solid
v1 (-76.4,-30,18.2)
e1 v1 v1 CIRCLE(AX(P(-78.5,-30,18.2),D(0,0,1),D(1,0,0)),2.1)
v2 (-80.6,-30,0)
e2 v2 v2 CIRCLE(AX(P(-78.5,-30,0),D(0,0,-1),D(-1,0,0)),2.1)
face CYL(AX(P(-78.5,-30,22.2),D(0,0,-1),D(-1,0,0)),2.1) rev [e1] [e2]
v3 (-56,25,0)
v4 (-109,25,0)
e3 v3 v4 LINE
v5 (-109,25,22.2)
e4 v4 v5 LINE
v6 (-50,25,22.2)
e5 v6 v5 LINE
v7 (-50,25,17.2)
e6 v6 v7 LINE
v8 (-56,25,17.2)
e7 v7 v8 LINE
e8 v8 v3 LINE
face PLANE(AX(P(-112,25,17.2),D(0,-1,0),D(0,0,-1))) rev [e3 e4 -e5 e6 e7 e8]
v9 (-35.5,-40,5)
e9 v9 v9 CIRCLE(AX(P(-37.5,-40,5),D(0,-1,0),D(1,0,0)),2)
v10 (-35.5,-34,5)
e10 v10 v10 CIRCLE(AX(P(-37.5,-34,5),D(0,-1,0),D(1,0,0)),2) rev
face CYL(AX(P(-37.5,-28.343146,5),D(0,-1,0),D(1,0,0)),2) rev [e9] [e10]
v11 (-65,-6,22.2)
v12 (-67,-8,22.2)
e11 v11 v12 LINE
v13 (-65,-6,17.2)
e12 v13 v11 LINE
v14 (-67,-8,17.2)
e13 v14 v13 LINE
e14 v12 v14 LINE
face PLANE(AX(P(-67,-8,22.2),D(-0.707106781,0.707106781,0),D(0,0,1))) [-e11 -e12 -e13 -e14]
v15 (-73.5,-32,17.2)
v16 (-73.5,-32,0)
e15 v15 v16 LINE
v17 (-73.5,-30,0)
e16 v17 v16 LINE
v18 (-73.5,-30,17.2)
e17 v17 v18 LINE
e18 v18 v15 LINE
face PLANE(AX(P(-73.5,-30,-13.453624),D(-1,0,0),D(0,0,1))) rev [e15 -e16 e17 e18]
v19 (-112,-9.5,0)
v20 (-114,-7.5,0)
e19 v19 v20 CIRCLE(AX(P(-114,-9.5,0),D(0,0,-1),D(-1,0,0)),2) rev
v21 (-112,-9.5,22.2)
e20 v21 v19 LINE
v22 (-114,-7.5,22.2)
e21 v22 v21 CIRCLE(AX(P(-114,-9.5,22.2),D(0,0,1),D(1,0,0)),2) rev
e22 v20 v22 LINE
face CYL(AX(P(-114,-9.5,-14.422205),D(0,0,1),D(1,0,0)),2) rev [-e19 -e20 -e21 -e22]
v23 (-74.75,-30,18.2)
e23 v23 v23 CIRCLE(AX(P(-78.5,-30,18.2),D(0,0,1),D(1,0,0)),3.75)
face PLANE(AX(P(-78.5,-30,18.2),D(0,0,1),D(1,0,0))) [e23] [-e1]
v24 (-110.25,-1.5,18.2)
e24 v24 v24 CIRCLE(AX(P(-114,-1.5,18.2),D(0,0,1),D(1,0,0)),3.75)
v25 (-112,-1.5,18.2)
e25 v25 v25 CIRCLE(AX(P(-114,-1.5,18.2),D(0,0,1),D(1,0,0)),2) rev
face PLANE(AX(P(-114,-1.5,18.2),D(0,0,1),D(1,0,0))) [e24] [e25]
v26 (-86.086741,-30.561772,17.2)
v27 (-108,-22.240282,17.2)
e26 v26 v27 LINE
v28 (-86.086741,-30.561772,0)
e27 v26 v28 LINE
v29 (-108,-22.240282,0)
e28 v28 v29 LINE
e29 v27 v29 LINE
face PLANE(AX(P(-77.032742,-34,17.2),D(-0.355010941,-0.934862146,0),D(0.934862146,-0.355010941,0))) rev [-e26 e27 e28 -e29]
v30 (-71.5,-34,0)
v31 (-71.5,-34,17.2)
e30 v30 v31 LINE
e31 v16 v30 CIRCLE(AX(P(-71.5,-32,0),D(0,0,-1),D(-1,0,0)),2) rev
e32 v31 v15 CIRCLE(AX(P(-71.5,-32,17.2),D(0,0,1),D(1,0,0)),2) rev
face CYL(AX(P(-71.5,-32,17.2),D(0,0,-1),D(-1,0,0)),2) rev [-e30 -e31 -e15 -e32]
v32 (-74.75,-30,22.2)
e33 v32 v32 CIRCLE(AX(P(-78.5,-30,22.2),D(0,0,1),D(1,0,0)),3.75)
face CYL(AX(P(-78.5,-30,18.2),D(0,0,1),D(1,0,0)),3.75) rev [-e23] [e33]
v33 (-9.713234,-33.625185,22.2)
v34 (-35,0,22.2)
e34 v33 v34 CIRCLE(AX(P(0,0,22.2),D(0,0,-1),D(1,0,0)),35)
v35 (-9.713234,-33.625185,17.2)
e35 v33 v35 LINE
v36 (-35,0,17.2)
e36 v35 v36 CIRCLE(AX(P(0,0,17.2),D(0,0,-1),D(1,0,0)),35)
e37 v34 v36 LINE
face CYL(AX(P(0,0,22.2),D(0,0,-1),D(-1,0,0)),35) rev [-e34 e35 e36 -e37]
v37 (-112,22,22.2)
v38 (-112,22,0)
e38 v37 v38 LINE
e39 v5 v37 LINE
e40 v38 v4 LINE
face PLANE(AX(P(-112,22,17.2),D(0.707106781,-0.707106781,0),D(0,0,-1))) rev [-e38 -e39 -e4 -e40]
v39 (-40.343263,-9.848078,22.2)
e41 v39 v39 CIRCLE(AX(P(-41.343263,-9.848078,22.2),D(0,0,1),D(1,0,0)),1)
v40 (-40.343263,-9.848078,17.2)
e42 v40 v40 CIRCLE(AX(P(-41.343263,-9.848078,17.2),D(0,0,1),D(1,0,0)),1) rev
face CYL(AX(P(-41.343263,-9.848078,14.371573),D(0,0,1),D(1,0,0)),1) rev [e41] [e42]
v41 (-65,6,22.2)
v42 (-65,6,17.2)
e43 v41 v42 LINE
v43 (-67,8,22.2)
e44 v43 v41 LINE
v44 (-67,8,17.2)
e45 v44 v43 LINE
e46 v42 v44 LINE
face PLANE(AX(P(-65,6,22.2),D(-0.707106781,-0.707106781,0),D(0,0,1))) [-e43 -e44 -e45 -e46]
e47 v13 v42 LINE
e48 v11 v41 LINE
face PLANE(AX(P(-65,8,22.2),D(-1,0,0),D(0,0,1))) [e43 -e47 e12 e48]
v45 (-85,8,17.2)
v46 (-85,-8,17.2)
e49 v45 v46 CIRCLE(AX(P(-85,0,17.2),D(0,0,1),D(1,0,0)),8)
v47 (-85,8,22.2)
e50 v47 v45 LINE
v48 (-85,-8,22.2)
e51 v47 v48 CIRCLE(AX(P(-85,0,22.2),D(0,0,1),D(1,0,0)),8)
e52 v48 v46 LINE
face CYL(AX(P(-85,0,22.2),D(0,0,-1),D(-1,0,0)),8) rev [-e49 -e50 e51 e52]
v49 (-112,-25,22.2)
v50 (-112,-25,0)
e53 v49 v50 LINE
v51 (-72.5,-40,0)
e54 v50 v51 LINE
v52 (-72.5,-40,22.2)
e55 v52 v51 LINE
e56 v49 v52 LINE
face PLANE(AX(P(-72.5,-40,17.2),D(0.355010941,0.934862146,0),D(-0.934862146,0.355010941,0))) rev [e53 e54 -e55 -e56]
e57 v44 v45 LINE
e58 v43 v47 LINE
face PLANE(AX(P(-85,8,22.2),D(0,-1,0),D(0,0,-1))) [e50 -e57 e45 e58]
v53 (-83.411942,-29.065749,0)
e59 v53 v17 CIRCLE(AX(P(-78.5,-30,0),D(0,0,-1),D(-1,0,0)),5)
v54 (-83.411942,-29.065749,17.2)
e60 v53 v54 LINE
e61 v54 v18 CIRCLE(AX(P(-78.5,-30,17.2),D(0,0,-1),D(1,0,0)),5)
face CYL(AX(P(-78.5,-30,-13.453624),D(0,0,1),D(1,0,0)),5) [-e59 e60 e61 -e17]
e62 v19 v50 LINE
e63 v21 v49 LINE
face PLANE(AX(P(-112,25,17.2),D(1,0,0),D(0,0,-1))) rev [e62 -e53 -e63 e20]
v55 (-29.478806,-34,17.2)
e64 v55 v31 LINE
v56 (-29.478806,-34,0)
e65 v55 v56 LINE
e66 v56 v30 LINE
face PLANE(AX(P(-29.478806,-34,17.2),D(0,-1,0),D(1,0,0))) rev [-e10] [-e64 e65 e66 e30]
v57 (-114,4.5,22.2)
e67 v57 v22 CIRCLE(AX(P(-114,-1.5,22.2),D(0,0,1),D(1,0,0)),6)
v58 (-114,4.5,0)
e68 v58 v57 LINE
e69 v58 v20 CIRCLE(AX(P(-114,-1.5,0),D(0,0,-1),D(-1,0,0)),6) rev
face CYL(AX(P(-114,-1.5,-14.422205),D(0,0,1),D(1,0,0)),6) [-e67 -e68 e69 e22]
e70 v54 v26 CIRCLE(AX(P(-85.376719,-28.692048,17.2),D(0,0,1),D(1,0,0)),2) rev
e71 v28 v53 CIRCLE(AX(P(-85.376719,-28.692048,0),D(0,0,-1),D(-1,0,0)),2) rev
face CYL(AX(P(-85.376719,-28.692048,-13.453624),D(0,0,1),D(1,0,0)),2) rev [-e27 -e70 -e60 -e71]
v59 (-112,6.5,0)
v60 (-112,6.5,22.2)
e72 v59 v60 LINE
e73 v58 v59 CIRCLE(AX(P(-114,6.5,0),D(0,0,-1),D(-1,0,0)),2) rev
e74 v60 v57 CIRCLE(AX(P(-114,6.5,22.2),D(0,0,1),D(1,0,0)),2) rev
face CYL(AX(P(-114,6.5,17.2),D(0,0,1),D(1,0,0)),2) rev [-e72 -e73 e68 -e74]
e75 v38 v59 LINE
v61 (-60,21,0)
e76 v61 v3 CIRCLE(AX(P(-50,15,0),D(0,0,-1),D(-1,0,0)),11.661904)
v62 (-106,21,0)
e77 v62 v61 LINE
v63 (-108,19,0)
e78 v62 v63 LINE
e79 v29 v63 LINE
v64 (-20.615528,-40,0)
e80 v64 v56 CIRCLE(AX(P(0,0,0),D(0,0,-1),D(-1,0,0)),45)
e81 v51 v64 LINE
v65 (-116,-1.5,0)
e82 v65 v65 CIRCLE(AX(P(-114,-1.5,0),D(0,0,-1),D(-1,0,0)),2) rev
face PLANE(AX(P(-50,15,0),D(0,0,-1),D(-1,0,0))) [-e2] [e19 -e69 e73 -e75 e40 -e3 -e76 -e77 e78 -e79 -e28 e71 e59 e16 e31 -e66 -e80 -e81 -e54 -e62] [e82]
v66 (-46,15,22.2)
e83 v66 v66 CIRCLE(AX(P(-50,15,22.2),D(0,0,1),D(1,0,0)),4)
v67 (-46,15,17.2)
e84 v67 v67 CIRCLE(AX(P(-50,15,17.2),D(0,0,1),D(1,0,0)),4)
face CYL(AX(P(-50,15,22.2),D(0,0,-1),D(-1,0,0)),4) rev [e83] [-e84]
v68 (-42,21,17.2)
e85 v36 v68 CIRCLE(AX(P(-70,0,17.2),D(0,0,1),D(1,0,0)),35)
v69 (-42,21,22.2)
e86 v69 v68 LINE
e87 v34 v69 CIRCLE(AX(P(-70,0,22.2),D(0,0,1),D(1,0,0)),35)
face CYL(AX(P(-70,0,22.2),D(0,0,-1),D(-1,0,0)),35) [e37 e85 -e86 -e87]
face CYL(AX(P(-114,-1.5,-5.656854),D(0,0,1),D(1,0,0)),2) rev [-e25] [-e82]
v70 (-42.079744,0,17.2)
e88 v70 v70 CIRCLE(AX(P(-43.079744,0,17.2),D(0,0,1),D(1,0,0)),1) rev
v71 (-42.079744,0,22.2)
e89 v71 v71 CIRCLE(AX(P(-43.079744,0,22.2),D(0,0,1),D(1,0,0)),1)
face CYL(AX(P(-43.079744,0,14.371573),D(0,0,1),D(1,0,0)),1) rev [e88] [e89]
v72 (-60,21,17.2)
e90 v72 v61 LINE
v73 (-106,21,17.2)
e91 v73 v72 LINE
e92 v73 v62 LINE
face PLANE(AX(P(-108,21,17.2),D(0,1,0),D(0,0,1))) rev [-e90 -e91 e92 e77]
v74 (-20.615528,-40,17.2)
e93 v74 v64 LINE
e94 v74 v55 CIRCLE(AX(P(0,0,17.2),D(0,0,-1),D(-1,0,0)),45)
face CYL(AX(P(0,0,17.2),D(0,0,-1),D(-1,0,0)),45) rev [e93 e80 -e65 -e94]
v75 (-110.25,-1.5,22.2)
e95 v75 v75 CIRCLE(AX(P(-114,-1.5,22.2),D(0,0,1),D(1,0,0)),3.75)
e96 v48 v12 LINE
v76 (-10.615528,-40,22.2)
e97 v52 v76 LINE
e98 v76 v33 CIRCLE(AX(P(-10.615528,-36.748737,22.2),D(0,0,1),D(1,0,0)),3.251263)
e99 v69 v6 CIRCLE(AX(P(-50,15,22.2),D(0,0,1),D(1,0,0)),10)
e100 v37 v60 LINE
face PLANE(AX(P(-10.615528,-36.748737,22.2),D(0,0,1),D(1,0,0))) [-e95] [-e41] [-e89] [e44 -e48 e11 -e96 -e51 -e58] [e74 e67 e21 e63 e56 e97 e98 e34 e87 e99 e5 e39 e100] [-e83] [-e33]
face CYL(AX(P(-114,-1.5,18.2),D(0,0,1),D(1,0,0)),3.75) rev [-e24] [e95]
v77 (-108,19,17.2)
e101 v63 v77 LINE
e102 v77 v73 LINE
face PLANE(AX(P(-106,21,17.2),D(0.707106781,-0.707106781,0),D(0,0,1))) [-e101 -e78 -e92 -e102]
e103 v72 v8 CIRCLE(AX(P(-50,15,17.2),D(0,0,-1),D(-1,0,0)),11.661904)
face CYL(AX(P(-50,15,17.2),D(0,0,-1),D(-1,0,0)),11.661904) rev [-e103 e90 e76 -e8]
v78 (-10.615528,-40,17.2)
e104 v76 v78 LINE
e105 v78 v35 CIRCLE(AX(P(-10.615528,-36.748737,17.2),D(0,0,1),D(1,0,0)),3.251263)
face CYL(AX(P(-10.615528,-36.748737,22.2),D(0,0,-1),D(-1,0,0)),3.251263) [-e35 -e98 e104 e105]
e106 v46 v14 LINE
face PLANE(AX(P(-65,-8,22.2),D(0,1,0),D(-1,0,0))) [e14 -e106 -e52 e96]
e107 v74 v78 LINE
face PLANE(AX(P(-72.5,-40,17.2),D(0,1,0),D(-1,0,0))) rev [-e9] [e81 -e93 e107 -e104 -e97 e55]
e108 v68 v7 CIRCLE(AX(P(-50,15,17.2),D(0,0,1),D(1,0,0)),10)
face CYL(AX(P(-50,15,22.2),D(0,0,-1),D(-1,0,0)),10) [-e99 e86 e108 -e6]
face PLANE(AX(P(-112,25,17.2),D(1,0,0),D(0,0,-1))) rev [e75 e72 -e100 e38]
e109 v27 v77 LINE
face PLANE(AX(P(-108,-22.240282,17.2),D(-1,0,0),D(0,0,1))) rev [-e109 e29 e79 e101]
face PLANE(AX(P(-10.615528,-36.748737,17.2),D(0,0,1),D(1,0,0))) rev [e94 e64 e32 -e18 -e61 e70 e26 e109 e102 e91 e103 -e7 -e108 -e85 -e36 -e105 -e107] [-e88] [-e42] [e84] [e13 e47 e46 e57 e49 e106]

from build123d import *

# Parameters (mm, degrees)
BOSS_EXTRUDE1_DEPTH = 17.2
CHAMFER3_SIZE       = 3
CHAMFER2_SIZE       = 2
SKETCH2_R           = 4
SKETCH2_R_2         = 2.1
BOSS_EXTRUDE2_DEPTH = 5
SKETCH3_R           = 1
CUT_EXTRUDE1_DEPTH  = 5
BOSS_EXTRUDE8_START = 17.2
SKETCH10_R          = 2.1
BOSS_EXTRUDE8_DEPTH = 17.2
SKETCH11_R          = 3.75
CUT_EXTRUDE2_DEPTH  = 4
BOSS_EXTRUDE9_DEPTH = 22.2
FILLET3_R           = 2
SKETCH13_R          = 2
CUT_EXTRUDE3_DEPTH  = 22.2
SKETCH14_R          = 3.75
CUT_EXTRUDE4_DEPTH  = 4
SKETCH15_R          = 2
CUT_EXTRUDE5_DEPTH  = 6
FILLET4_R           = 2
CHAMFER4_SIZE       = 2


with BuildPart() as part:
    # Sketch1 → Boss-Extrude1 (new body)
    with BuildSketch(Plane.XY):
        with BuildLine():
            Line((-112, 25), (-112, -25))
            Line((-112, -25), (-72.5, -40))
            Line((-72.5, -40), (-20.615528128, -40))
            ThreePointArc((-20.615528128, -40), (-25.226188309, -37.264452544), (-29.478805946, -34))
            Line((-29.478805946, -34), (-77.032741633, -34))
            Line((-77.032741633, -34), (-108, -22.240281633))
            Line((-108, -22.240281633), (-108, 21))
            Line((-108, 21), (-60, 21))
            ThreePointArc((-60, 21), (-58.246211251, 23.246211251), (-56, 25))
            Line((-56, 25), (-112, 25))
        make_face()
    extrude(amount=BOSS_EXTRUDE1_DEPTH)

    # Chamfer3
    chamfer3_edges = [part.edges().sort_by_distance(p)[0] for p in [
        (-112, 25, 8.6),
    ]]
    chamfer(chamfer3_edges, length=CHAMFER3_SIZE)

    # Chamfer2
    chamfer2_edges = [part.edges().sort_by_distance(p)[0] for p in [
        (-108, 21, 8.6),
    ]]
    chamfer(chamfer2_edges, length=CHAMFER2_SIZE)

    # Sketch2 → Boss-Extrude2 (add)
    with BuildSketch(Plane.XY.offset(17.2)):
        with BuildLine():
            Line((-72.5, -40), (-20.615528128, -40))
            Line((-20.615528128, -40), (-10.615528128, -40))
            ThreePointArc((-10.615528128, -40), (-7.396351284, -37.204380582), (-9.713234444, -33.625185154))
            ThreePointArc((-9.713234444, -33.625185154), (-27.972872623, -21.03612125), (-35, 0))
            ThreePointArc((-35, 0), (-36.796084568, 11.067971811), (-42, 21))
            ThreePointArc((-42, 21), (-45.527864045, 23.94427191), (-50, 25))
            Line((-50, 25), (-109, 25))
            Line((-109, 25), (-112, 22))
            Line((-112, 22), (-112, -25))
            Line((-112, -25), (-72.5, -40))
        make_face()
        with Locations((-50, 15)):
            Circle(SKETCH2_R, mode=Mode.SUBTRACT)
        with Locations((-78.5, -30)):
            Circle(SKETCH2_R_2, mode=Mode.SUBTRACT)
        with BuildLine():
            Line((-85, 8), (-65, 8))
            Line((-65, 8), (-65, -8))
            Line((-65, -8), (-85, -8))
            ThreePointArc((-85, -8), (-93, 0), (-85, 8))
        make_face(mode=Mode.SUBTRACT)
    extrude(amount=BOSS_EXTRUDE2_DEPTH)

    # Sketch3 → Cut-Extrude1 (cut)
    with BuildSketch(Plane.XY.offset(22.2)):
        with Locations((-43.079744456, 0)):
            Circle(SKETCH3_R)
        with Locations((-41.343262679, -9.84807753)):
            Circle(SKETCH3_R)
    extrude(amount=-CUT_EXTRUDE1_DEPTH, mode=Mode.SUBTRACT)

    # Sketch10 → Boss-Extrude8 (add)
    with BuildSketch(Plane(origin=(0, 0, 17.2), x_dir=(-1, 0, 0), z_dir=(0, 0, -1)).offset(BOSS_EXTRUDE8_START)):
        with BuildLine():
            Line((83.5, -30), (83.5, -34))
            Line((83.5, -34), (73.5, -34))
            Line((73.5, -34), (73.5, -30))
            ThreePointArc((73.5, -30), (78.5, -25), (83.5, -30))
        make_face()
        with Locations((78.5, -30)):
            Circle(SKETCH10_R, mode=Mode.SUBTRACT)
    extrude(amount=-BOSS_EXTRUDE8_DEPTH)

    # Sketch11 → Cut-Extrude2 (cut)
    with BuildSketch(Plane.XY.offset(22.2)):
        with Locations((-78.5, -30)):
            Circle(SKETCH11_R)
    extrude(amount=-CUT_EXTRUDE2_DEPTH, mode=Mode.SUBTRACT)

    # Sketch12 → Boss-Extrude9 (add)
    with BuildSketch(Plane.XY.offset(22.2)):
        with BuildLine():
            Line((-114, 4.5), (-112, 4.5))
            Line((-112, 4.5), (-112, -7.5))
            Line((-112, -7.5), (-114, -7.5))
            ThreePointArc((-114, -7.5), (-120, -1.5), (-114, 4.5))
        make_face()
    extrude(amount=-BOSS_EXTRUDE9_DEPTH)

    # Fillet3
    fillet3_edges = [part.edges().sort_by_distance(p)[0] for p in [
        (-112, -7.5, 11.1),
        (-112, 4.5, 11.1),
    ]]
    fillet(fillet3_edges, radius=FILLET3_R - 0.0001)  # a hair under: the kernel refuses the full size

    # Sketch13 → Cut-Extrude3 (cut)
    with BuildSketch(Plane.XY.offset(22.2)):
        with Locations((-114, -1.5)):
            Circle(SKETCH13_R)
    extrude(amount=-CUT_EXTRUDE3_DEPTH, mode=Mode.SUBTRACT)

    # Sketch14 → Cut-Extrude4 (cut)
    with BuildSketch(Plane.XY.offset(22.2)):
        with Locations((-114, -1.5)):
            Circle(SKETCH14_R)
    extrude(amount=-CUT_EXTRUDE4_DEPTH, mode=Mode.SUBTRACT)

    # Sketch15 → Cut-Extrude5 (cut)
    with BuildSketch(Plane.XZ.offset(40)):
        with Locations((-37.5, 5)):
            Circle(SKETCH15_R)
    extrude(amount=-CUT_EXTRUDE5_DEPTH, mode=Mode.SUBTRACT)

    # Fillet4
    fillet4_edges = [part.edges().sort_by_distance(p)[0] for p in [
        (-73.5, -34, 8.6),
        (-83.5, -31.544079101, 8.6),
    ]]
    fillet(fillet4_edges, radius=FILLET4_R)

    # Chamfer4
    chamfer4_edges = [part.edges().sort_by_distance(p)[0] for p in [
        (-65, -8, 19.7),
        (-65, 8, 19.7),
    ]]
    chamfer(chamfer4_edges, length=CHAMFER4_SIZE)


solid = part.part
